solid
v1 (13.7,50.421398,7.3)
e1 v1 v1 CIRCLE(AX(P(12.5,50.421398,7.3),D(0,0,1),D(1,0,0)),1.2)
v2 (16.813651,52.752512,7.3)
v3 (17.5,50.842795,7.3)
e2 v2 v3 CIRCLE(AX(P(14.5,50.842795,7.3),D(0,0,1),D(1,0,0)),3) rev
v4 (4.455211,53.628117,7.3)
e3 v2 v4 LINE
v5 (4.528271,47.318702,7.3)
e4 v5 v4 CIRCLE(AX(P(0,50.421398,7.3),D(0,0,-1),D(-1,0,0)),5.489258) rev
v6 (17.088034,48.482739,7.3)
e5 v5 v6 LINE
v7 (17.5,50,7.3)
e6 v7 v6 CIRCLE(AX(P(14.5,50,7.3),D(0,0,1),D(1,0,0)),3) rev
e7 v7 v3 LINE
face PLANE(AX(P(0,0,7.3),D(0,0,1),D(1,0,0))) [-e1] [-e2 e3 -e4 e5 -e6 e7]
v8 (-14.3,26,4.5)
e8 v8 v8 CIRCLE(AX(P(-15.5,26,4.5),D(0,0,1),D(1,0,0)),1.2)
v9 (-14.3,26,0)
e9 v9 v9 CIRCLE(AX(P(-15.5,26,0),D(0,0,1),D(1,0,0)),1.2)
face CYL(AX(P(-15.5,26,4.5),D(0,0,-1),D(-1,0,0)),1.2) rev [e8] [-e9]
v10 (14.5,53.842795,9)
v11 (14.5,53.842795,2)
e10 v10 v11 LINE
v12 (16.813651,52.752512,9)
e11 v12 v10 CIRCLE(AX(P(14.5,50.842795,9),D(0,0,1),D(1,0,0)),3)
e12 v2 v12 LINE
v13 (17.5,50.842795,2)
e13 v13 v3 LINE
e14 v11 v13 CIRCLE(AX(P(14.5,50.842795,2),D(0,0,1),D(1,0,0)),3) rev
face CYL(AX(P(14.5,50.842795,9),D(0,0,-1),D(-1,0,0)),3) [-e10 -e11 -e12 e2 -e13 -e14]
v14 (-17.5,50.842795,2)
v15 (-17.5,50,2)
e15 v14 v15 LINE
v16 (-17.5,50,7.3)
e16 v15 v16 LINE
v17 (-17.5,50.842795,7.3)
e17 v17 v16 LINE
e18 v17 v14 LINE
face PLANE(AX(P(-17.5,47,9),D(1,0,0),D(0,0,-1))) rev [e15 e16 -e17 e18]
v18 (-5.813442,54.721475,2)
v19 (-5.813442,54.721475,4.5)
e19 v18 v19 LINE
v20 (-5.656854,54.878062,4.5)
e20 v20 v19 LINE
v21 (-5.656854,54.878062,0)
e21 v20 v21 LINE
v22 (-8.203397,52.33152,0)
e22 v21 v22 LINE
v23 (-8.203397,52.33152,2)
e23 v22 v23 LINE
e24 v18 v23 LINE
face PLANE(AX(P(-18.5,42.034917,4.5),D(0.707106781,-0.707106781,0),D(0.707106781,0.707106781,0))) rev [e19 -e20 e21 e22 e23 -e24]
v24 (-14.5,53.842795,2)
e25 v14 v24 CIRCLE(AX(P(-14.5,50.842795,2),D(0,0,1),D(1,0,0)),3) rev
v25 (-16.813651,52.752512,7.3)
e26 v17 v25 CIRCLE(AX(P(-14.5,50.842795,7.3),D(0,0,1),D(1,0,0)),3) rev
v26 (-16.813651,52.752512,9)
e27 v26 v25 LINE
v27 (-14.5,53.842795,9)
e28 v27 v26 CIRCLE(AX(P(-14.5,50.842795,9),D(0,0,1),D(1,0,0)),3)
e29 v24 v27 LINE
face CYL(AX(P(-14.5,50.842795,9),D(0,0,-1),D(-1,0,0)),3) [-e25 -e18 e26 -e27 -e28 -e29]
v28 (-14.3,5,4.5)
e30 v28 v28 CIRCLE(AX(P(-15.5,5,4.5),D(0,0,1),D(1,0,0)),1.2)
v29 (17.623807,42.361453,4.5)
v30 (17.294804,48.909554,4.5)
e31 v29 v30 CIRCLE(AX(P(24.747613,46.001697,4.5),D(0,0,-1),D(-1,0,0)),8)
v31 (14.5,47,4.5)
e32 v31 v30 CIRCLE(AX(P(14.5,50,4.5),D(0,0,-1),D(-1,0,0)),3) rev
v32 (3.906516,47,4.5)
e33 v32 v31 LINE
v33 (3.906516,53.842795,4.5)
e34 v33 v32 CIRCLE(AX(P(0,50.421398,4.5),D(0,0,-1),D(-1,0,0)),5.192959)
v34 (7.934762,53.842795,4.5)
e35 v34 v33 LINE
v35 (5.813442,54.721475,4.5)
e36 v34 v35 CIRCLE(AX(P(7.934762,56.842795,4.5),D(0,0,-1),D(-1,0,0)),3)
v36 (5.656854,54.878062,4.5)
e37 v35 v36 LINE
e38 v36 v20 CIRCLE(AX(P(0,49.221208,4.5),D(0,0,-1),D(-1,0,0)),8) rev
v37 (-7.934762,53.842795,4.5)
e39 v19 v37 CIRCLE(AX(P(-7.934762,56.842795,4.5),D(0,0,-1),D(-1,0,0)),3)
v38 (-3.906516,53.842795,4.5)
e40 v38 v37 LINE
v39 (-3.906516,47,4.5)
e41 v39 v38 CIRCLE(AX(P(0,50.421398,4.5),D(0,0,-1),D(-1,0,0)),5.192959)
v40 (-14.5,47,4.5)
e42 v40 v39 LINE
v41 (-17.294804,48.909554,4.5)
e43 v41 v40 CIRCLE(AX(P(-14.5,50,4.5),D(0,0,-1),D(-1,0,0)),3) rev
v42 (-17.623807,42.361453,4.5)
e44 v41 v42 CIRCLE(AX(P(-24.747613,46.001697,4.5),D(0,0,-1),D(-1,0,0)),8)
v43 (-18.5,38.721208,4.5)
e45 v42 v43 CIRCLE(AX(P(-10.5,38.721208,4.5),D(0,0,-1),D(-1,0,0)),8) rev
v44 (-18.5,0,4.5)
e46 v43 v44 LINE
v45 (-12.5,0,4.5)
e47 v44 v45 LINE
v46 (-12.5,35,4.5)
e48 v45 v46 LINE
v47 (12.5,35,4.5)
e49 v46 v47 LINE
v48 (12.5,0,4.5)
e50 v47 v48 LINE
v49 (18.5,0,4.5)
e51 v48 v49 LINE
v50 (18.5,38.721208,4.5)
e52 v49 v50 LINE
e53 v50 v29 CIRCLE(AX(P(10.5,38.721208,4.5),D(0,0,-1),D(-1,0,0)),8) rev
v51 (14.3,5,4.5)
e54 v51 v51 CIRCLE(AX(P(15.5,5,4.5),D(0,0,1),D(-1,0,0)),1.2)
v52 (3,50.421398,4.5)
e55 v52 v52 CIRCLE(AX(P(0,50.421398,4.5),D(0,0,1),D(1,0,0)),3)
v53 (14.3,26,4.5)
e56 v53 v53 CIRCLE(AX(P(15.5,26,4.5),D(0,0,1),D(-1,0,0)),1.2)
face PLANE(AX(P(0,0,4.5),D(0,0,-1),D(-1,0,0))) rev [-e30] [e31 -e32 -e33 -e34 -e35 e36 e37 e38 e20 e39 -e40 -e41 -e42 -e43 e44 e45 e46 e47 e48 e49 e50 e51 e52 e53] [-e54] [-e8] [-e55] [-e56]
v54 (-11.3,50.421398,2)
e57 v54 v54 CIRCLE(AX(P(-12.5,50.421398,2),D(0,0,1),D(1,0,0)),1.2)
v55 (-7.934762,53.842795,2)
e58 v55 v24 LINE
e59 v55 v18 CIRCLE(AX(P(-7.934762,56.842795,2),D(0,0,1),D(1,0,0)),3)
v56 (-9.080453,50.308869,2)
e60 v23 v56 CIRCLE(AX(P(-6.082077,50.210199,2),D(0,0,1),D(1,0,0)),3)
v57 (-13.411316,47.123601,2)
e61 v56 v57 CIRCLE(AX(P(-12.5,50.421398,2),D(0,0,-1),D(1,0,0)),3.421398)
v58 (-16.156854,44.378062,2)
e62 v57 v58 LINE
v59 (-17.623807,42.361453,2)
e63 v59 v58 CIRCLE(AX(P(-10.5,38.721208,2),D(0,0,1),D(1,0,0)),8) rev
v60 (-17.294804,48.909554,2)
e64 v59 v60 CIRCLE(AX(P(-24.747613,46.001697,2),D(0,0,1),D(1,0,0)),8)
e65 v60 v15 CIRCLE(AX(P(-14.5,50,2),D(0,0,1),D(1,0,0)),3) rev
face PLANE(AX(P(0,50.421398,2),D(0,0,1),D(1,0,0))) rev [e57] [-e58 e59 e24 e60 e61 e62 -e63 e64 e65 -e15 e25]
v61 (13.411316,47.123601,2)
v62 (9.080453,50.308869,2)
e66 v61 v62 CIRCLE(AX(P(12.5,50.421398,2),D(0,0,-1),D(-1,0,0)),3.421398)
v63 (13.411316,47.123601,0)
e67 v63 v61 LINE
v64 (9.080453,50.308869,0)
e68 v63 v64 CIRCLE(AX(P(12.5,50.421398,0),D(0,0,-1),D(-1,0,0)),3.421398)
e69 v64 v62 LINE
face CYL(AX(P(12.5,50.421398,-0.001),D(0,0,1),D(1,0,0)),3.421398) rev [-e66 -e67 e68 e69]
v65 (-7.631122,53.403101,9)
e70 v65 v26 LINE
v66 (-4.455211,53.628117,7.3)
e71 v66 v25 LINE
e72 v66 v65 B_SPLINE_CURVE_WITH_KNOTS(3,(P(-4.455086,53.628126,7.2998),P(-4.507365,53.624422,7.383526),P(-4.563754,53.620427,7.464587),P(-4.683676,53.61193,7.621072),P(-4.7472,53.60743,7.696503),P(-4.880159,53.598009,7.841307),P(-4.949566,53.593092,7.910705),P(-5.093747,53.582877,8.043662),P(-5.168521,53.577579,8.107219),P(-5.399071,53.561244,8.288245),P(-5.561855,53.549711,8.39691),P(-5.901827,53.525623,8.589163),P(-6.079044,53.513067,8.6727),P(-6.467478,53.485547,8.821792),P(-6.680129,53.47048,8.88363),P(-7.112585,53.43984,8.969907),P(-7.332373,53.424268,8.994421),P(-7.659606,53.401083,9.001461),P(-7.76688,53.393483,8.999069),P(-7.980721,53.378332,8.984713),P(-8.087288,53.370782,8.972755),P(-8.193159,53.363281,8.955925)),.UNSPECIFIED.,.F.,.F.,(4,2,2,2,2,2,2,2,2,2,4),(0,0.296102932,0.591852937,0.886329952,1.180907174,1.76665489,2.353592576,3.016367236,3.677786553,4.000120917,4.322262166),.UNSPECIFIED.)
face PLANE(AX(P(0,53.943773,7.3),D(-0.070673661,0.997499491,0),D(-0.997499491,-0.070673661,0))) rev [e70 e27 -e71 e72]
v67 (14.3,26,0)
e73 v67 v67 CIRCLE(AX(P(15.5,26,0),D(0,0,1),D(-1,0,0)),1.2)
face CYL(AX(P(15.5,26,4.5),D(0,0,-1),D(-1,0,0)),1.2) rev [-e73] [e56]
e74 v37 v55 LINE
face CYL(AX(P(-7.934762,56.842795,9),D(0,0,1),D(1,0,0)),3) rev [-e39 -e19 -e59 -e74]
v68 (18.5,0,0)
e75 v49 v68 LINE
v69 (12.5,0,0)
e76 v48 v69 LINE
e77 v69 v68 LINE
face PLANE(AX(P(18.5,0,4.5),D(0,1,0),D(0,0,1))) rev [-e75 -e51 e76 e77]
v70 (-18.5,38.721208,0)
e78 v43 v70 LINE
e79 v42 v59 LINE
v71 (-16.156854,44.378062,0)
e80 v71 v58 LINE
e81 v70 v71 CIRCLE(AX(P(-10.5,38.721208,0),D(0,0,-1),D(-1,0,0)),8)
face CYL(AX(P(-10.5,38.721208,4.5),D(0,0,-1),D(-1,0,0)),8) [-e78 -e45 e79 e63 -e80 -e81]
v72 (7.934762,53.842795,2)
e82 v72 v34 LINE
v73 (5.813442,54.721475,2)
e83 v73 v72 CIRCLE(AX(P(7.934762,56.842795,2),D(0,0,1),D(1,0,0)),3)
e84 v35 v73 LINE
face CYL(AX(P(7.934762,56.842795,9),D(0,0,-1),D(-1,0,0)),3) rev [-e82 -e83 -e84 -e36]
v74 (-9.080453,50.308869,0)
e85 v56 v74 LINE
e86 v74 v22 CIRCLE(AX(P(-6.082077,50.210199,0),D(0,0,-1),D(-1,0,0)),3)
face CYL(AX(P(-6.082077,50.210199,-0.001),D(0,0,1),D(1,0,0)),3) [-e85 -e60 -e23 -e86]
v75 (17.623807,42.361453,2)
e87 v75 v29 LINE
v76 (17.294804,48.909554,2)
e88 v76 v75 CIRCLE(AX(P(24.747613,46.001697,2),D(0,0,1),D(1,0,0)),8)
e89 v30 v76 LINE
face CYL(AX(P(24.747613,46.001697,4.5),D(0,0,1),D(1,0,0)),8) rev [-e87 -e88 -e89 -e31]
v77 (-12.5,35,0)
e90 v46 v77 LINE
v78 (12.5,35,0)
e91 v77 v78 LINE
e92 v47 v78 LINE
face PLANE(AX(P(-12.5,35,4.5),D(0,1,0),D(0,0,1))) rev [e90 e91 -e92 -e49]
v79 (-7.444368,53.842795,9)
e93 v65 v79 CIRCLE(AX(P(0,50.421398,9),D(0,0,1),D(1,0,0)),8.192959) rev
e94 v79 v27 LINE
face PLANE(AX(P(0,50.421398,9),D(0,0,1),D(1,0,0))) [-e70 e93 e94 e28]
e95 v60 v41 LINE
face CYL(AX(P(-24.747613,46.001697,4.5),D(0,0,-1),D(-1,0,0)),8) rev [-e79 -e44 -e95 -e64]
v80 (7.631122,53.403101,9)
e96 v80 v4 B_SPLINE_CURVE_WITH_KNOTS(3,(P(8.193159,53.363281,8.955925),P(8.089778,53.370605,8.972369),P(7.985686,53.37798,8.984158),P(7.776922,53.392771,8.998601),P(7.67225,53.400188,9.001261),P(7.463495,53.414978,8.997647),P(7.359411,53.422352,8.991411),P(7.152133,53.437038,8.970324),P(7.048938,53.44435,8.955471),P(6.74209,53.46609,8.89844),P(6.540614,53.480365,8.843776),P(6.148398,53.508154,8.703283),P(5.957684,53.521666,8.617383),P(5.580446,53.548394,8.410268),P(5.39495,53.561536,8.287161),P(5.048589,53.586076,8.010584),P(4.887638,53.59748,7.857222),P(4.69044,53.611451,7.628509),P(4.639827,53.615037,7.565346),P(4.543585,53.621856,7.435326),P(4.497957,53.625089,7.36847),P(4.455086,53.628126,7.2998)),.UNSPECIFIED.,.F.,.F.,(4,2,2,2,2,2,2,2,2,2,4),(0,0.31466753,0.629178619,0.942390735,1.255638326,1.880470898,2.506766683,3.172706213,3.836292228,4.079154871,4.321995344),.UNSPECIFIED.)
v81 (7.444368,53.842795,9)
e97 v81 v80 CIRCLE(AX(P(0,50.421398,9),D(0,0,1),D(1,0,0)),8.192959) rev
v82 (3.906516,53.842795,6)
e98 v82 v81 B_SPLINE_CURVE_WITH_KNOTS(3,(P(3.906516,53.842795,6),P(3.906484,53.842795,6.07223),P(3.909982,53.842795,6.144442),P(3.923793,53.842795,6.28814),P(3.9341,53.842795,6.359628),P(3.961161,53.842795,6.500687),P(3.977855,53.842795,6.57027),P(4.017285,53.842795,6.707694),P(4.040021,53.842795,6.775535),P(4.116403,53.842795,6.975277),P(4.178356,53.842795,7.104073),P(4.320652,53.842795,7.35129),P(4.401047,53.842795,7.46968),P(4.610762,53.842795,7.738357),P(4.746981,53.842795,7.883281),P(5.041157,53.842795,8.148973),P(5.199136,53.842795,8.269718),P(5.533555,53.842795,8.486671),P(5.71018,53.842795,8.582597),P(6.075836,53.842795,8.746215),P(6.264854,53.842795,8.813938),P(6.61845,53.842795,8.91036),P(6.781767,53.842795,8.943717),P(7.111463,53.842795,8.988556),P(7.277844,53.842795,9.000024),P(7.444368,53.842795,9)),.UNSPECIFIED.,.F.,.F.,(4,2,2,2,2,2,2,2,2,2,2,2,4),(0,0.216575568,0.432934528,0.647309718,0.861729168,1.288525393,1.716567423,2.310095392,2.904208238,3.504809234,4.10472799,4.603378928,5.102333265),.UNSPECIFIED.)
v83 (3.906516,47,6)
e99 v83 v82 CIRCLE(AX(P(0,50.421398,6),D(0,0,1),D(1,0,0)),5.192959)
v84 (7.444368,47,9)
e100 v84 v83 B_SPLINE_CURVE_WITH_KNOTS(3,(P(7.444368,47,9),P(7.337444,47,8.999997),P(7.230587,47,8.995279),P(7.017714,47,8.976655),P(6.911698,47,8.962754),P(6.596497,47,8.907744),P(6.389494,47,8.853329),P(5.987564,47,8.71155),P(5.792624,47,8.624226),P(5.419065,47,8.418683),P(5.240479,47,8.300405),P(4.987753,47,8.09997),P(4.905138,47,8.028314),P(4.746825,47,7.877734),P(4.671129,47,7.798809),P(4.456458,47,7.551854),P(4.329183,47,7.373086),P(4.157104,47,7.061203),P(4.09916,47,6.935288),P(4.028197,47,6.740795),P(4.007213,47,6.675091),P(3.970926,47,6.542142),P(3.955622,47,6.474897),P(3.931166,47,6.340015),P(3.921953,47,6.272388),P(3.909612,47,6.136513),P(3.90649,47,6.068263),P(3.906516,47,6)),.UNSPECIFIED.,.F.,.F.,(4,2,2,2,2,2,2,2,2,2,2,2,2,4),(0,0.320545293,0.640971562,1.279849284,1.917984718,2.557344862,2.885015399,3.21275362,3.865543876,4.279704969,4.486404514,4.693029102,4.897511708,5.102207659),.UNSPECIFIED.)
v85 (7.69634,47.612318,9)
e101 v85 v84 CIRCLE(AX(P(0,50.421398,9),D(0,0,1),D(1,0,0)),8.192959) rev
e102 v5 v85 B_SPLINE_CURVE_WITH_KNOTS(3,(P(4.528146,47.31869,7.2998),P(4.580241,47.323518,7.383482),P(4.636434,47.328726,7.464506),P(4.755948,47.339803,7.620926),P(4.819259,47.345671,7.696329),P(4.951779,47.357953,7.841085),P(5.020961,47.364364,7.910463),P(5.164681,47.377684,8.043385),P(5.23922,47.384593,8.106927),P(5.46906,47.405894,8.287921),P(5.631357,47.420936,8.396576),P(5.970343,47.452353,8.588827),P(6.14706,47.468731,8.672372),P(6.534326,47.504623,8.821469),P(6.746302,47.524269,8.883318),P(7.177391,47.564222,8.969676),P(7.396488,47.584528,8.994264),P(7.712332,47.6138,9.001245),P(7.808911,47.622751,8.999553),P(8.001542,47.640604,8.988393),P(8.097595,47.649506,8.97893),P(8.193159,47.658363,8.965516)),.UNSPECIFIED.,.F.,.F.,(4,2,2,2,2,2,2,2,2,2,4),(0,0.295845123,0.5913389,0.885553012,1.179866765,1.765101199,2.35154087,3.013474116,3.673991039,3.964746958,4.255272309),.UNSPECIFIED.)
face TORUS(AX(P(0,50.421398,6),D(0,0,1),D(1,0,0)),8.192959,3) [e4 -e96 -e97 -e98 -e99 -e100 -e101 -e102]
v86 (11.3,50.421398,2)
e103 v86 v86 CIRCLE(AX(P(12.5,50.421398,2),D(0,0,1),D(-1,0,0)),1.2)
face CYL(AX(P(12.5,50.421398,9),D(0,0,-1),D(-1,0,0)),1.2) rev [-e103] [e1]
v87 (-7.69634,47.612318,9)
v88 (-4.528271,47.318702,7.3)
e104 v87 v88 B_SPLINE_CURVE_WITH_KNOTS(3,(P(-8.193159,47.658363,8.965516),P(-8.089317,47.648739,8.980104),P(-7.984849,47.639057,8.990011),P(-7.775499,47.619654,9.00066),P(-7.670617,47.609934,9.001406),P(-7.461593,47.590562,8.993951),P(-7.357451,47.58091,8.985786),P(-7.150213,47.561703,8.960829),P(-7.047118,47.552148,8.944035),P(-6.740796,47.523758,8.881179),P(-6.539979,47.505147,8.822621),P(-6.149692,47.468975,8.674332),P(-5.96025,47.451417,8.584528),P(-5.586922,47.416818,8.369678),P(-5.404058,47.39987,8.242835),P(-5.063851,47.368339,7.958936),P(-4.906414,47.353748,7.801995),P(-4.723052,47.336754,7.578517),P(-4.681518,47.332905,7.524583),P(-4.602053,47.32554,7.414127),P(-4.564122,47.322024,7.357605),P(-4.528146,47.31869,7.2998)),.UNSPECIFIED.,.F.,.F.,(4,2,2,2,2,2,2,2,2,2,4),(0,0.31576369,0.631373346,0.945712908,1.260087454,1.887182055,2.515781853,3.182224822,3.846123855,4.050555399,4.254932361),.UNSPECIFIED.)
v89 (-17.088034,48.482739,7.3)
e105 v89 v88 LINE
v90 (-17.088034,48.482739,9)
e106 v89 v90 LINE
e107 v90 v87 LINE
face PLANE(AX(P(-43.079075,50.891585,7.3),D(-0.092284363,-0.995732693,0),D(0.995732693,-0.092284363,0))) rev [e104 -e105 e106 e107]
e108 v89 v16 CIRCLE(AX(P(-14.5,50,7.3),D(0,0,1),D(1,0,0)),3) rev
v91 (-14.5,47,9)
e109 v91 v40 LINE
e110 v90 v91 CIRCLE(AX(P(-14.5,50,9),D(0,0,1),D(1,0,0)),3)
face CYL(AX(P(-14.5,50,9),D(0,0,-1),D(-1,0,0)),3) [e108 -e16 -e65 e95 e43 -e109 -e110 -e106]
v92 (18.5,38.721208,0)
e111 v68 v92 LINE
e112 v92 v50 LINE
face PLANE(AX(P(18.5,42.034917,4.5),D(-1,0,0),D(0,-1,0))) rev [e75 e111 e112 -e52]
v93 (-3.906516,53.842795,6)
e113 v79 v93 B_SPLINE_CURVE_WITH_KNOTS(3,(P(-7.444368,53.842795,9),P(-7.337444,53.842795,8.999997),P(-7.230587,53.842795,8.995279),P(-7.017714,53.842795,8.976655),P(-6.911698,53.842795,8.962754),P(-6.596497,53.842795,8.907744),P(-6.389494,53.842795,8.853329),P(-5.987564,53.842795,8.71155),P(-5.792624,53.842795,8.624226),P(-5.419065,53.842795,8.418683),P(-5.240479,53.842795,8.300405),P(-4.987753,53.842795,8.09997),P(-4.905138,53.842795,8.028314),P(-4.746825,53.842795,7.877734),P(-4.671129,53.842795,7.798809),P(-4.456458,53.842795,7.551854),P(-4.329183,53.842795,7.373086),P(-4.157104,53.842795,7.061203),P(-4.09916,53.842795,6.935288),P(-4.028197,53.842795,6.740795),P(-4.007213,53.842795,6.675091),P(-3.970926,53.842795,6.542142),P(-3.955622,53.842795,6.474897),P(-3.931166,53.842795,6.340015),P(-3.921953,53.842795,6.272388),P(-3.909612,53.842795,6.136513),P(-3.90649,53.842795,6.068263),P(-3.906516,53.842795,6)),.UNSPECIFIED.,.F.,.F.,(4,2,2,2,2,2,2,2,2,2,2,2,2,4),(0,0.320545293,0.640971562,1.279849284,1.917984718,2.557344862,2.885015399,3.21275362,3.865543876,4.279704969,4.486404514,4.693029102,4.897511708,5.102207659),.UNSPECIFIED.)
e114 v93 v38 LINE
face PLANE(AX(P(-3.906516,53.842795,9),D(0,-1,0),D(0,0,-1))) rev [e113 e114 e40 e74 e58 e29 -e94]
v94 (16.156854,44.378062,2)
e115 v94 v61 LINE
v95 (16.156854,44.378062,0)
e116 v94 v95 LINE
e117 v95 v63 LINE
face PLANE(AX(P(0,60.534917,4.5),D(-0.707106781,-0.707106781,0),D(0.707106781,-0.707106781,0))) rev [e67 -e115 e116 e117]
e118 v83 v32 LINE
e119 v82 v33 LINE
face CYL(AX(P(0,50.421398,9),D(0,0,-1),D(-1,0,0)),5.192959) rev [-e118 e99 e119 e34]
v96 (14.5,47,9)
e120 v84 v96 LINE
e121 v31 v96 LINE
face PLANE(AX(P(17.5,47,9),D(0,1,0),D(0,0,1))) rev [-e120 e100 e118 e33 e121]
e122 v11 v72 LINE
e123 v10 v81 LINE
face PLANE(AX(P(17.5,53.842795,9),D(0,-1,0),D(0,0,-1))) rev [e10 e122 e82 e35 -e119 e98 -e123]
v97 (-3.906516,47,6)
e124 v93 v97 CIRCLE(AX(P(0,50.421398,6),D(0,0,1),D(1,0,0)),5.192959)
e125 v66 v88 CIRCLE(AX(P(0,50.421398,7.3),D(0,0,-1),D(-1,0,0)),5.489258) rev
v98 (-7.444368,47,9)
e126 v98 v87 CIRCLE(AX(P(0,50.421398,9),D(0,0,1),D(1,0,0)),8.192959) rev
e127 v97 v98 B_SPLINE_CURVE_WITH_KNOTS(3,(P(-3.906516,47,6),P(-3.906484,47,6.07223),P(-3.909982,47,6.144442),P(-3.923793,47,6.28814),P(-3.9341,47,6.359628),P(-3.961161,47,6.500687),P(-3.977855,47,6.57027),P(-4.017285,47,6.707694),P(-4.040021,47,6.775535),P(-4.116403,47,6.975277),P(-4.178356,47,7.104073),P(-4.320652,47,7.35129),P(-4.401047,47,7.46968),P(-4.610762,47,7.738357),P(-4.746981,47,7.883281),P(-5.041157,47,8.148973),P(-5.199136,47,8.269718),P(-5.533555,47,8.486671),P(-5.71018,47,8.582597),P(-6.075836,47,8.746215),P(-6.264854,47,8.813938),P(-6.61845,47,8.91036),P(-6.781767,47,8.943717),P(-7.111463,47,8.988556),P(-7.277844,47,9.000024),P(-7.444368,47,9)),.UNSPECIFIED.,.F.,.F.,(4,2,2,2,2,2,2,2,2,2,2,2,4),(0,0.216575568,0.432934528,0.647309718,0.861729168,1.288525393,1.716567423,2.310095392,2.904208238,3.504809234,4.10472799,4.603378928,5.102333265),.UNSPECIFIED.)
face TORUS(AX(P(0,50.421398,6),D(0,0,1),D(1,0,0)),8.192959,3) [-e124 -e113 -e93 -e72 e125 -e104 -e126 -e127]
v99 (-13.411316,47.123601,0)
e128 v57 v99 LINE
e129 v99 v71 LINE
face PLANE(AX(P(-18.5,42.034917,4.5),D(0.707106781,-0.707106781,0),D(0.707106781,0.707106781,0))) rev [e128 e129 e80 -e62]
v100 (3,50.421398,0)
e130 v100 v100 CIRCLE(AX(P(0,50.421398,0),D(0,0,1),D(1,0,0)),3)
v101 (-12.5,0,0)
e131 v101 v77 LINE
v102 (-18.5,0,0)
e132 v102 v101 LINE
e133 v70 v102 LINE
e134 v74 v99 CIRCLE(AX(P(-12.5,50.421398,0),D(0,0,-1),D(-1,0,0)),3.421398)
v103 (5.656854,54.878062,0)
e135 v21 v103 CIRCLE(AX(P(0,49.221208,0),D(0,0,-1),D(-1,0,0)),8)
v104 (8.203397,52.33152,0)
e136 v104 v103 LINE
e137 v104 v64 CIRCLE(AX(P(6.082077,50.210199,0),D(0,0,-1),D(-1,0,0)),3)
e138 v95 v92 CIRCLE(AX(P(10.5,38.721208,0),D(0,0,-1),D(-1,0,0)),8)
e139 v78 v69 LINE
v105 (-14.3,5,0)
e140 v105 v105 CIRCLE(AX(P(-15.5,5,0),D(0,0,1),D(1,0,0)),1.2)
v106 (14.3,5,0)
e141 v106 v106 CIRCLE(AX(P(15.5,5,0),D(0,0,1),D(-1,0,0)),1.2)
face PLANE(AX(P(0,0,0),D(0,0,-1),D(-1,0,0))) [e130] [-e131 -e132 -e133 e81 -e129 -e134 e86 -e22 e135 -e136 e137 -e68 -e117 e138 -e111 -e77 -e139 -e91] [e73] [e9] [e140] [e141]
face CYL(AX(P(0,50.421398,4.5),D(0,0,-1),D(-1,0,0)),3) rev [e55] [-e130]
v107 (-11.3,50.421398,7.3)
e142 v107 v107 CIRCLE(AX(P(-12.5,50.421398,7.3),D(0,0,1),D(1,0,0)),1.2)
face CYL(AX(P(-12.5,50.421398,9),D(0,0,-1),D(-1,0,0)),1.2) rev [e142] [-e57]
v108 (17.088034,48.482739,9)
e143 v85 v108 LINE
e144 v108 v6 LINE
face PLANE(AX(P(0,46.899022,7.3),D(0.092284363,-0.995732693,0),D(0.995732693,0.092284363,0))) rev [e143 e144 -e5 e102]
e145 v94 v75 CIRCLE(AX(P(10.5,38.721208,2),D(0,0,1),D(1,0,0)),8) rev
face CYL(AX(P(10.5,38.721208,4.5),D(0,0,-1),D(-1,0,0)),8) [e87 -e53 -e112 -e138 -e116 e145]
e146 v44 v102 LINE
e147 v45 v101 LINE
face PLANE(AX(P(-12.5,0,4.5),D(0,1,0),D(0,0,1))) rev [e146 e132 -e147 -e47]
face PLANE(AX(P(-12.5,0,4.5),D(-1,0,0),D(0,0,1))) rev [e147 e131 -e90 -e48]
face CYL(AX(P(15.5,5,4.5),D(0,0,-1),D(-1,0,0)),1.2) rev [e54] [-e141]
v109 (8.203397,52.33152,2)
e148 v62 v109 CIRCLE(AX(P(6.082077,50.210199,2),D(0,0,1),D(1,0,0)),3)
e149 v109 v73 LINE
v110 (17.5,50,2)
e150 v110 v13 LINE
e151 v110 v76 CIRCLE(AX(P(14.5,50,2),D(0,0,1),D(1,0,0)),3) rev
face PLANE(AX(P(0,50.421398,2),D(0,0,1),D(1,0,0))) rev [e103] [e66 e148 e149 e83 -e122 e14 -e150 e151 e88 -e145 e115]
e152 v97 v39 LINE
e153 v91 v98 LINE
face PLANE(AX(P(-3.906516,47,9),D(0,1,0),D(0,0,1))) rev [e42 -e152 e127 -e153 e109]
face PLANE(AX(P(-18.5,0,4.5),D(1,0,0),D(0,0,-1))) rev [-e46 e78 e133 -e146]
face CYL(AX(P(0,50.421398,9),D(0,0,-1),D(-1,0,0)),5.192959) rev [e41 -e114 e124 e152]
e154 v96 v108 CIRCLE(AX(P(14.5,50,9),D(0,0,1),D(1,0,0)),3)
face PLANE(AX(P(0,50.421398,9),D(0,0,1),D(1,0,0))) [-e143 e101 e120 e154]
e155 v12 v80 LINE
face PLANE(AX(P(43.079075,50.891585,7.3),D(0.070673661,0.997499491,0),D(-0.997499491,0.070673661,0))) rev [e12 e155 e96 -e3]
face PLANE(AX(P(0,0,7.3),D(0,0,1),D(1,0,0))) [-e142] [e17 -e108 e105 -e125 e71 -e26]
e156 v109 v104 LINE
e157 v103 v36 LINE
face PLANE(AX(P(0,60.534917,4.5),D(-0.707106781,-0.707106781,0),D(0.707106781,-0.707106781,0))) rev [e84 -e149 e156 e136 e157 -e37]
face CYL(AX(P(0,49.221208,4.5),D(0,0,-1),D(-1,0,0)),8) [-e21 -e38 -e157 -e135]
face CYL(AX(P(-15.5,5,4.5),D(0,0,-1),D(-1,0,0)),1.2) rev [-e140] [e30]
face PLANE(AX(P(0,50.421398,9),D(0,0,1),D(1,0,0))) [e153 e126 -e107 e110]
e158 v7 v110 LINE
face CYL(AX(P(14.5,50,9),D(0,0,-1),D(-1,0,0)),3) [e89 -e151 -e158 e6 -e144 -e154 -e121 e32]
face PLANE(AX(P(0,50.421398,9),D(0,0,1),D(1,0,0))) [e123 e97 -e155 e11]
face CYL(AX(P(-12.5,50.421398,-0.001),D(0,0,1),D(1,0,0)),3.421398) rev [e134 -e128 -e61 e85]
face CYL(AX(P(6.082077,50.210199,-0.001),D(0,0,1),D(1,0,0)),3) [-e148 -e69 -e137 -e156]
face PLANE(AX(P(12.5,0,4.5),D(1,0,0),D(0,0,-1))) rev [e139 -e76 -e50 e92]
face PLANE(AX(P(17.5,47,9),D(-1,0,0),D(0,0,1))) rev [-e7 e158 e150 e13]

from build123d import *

# Parameters (mm, degrees)
SKETCH_1_R           = 3
SKETCH_1_R_2         = 1.2
EXTRUDE_1_DEPTH      = 4.5
EXTRUDE_2_DEPTH      = 4.5
EXTRUDE_2_DEPTH_BACK = 2.5
SKETCH_2_R           = 1.2
FILLET_1_R           = 8
CUT_EXTRUDE_1_REACH  = 62.544
SKETCH_3_R           = 3.421397557
FILLET_2_R           = 3
CUT_EXTRUDE_2_DEPTH  = 1.7
FILLET_START         = 2
FILLET_3_DEPTH       = 2.5


with BuildPart() as part:
    # 草图1 → 凸台-拉伸1 (new body)
    with BuildSketch(Plane.XY):
        Polygon((-12.5, 0), (-18.5, 0), (-18.5, 42.034916596), (0, 60.534916596), (18.5, 42.034916596), (18.5, 0), (12.5, 0), (12.5, 35), (-12.5, 35), align=None)
        with Locations((0, 50.421397557)):
            Circle(SKETCH_1_R, mode=Mode.SUBTRACT)
        with Locations((-15.5, 5)):
            Circle(SKETCH_1_R_2, mode=Mode.SUBTRACT)
        with Locations((-15.5, 26)):
            Circle(SKETCH_1_R_2, mode=Mode.SUBTRACT)
        with Locations(Location((15.5, 5, 0), (0, 0, 180))):
            Circle(SKETCH_1_R_2, mode=Mode.SUBTRACT)
        with Locations(Location((15.5, 26, 0), (0, 0, 180))):
            Circle(SKETCH_1_R_2, mode=Mode.SUBTRACT)
    extrude(amount=EXTRUDE_1_DEPTH)

    # 草图2 → 凸台-拉伸2 (add, two sides: drawn at the far end of the back side and taken through both)
    # profile 1 of 2: a face of its own
    with BuildSketch(Plane.XY.offset(4.5).offset(-EXTRUDE_2_DEPTH_BACK)):
        with BuildLine():
            Line((17.5, 47), (3.906515802, 47))
            ThreePointArc((3.906515802, 47), (5.192959363, 50.421397557), (3.906515802, 53.842795113))
            Line((3.906515802, 53.842795113), (17.5, 53.842795113))
            Line((17.5, 53.842795113), (17.5, 47))
        make_face()
        with Locations(Location((12.5, 50.421397557, 0), (0, 0, 180))):
            Circle(SKETCH_2_R, mode=Mode.SUBTRACT)
    # profile 2 of 2: a face of its own
    with BuildSketch(Plane.XY.offset(4.5).offset(-EXTRUDE_2_DEPTH_BACK)):
        with BuildLine():
            Line((-17.5, 47), (-17.5, 53.842795113))
            Line((-17.5, 53.842795113), (-3.906515802, 53.842795113))
            ThreePointArc((-3.906515802, 53.842795113), (-5.192959363, 50.421397557), (-3.906515802, 47))
            Line((-3.906515802, 47), (-17.5, 47))
        make_face()
        with Locations((-12.5, 50.421397557)):
            Circle(SKETCH_2_R, mode=Mode.SUBTRACT)
    extrude(amount=EXTRUDE_2_DEPTH + EXTRUDE_2_DEPTH_BACK)

    # 圆角1
    fillet_1_edges = [part.edges().sort_by_distance(p)[0] for p in [
        (-18.5, 42.034916596, 2.25),
        (0, 60.534916596, 2.25),
        (18.5, 42.034916596, 2.25),
    ]]
    fillet(fillet_1_edges, radius=FILLET_1_R)

    # 草图3 → 切除-拉伸1 (cut, up to next)
    with BuildSketch(Plane(origin=(0, 0, 2), x_dir=(-1, 0, 0), z_dir=(0, 0, -1)), mode=Mode.PRIVATE) as cut_extrude_1_sk1:
        with Locations((-12.5, 50.421397557)):
            Circle(SKETCH_3_R)
    cut_extrude_1_tool1 = extrude(cut_extrude_1_sk1.sketch, amount=CUT_EXTRUDE_1_REACH, mode=Mode.PRIVATE) & part.part
    # 草图3 → 切除-拉伸1 (cut, up to next)
    with BuildSketch(Plane(origin=(0, 0, 2), x_dir=(-1, 0, 0), z_dir=(0, 0, -1)), mode=Mode.PRIVATE) as cut_extrude_1_sk2:
        with Locations((12.5, 50.421397557)):
            Circle(SKETCH_3_R)
    cut_extrude_1_tool2 = extrude(cut_extrude_1_sk2.sketch, amount=CUT_EXTRUDE_1_REACH, mode=Mode.PRIVATE) & part.part
    add(cut_extrude_1_tool1.solids().sort_by_distance((12.5, 50.421398, 2))[0], mode=Mode.SUBTRACT)
    add(cut_extrude_1_tool2.solids().sort_by_distance((-12.5, 50.421398, 2))[0], mode=Mode.SUBTRACT)

    # 圆角2
    fillet_2_edges = [part.edges().sort_by_distance(p)[0] for p in [
        (9.202203088, 51.332713509, 1),
        (-9.202203088, 51.332713509, 1),
        (-6.692121483, 53.842795113, 3.25),
        (-17.5, 47, 5.5),
        (-5.192959363, 50.421397557, 9),
        (-17.5, 53.842795113, 5.5),
        (6.692121483, 53.842795113, 3.25),
        (17.5, 53.842795113, 5.5),
        (5.192959363, 50.421397557, 9),
        (17.5, 47, 5.5),
    ]]
    fillet(fillet_2_edges, radius=FILLET_2_R)

    # 草图4 → 切除-拉伸2 (cut)
    with BuildSketch(Plane.XY.offset(9)):
        Polygon((0, 46.899022366), (43.079074711, 50.891584803), (0, 53.943772747), (-43.079074711, 50.891584803), align=None)
    extrude(amount=-CUT_EXTRUDE_2_DEPTH, mode=Mode.SUBTRACT)

    # 圆角3: read off the stored shape, not the designer's step
    # 圆角3 outline → 圆角3 (add)
    with BuildSketch(Plane.XY.offset(FILLET_START)):
        with BuildLine():
            ThreePointArc((17.623806552, 42.361452624), (16.757691875, 45.600251323), (17.294803574, 48.909553768))
            ThreePointArc((17.294803574, 48.909553768), (16.192433353, 47.52297167), (14.5, 47))
            Line((14.5, 47), (13.534916596, 47))
            Line((13.534916596, 47), (16.156854249, 44.378062347))
            ThreePointArc((16.156854249, 44.378062347), (16.969389563, 43.42726788), (17.623806552, 42.361452624))
        make_face()
        with BuildLine():
            ThreePointArc((-14.5, 47), (-16.192433353, 47.52297167), (-17.294803574, 48.909553768))
            ThreePointArc((-17.294803574, 48.909553768), (-16.757691875, 45.600251323), (-17.623806552, 42.361452624))
            ThreePointArc((-17.623806552, 42.361452624), (-16.969389563, 43.42726788), (-16.156854249, 44.378062347))
            Line((-16.156854249, 44.378062347), (-13.534916596, 47))
            Line((-13.534916596, 47), (-14.5, 47))
        make_face()
    extrude(amount=FILLET_3_DEPTH)


solid = part.part
